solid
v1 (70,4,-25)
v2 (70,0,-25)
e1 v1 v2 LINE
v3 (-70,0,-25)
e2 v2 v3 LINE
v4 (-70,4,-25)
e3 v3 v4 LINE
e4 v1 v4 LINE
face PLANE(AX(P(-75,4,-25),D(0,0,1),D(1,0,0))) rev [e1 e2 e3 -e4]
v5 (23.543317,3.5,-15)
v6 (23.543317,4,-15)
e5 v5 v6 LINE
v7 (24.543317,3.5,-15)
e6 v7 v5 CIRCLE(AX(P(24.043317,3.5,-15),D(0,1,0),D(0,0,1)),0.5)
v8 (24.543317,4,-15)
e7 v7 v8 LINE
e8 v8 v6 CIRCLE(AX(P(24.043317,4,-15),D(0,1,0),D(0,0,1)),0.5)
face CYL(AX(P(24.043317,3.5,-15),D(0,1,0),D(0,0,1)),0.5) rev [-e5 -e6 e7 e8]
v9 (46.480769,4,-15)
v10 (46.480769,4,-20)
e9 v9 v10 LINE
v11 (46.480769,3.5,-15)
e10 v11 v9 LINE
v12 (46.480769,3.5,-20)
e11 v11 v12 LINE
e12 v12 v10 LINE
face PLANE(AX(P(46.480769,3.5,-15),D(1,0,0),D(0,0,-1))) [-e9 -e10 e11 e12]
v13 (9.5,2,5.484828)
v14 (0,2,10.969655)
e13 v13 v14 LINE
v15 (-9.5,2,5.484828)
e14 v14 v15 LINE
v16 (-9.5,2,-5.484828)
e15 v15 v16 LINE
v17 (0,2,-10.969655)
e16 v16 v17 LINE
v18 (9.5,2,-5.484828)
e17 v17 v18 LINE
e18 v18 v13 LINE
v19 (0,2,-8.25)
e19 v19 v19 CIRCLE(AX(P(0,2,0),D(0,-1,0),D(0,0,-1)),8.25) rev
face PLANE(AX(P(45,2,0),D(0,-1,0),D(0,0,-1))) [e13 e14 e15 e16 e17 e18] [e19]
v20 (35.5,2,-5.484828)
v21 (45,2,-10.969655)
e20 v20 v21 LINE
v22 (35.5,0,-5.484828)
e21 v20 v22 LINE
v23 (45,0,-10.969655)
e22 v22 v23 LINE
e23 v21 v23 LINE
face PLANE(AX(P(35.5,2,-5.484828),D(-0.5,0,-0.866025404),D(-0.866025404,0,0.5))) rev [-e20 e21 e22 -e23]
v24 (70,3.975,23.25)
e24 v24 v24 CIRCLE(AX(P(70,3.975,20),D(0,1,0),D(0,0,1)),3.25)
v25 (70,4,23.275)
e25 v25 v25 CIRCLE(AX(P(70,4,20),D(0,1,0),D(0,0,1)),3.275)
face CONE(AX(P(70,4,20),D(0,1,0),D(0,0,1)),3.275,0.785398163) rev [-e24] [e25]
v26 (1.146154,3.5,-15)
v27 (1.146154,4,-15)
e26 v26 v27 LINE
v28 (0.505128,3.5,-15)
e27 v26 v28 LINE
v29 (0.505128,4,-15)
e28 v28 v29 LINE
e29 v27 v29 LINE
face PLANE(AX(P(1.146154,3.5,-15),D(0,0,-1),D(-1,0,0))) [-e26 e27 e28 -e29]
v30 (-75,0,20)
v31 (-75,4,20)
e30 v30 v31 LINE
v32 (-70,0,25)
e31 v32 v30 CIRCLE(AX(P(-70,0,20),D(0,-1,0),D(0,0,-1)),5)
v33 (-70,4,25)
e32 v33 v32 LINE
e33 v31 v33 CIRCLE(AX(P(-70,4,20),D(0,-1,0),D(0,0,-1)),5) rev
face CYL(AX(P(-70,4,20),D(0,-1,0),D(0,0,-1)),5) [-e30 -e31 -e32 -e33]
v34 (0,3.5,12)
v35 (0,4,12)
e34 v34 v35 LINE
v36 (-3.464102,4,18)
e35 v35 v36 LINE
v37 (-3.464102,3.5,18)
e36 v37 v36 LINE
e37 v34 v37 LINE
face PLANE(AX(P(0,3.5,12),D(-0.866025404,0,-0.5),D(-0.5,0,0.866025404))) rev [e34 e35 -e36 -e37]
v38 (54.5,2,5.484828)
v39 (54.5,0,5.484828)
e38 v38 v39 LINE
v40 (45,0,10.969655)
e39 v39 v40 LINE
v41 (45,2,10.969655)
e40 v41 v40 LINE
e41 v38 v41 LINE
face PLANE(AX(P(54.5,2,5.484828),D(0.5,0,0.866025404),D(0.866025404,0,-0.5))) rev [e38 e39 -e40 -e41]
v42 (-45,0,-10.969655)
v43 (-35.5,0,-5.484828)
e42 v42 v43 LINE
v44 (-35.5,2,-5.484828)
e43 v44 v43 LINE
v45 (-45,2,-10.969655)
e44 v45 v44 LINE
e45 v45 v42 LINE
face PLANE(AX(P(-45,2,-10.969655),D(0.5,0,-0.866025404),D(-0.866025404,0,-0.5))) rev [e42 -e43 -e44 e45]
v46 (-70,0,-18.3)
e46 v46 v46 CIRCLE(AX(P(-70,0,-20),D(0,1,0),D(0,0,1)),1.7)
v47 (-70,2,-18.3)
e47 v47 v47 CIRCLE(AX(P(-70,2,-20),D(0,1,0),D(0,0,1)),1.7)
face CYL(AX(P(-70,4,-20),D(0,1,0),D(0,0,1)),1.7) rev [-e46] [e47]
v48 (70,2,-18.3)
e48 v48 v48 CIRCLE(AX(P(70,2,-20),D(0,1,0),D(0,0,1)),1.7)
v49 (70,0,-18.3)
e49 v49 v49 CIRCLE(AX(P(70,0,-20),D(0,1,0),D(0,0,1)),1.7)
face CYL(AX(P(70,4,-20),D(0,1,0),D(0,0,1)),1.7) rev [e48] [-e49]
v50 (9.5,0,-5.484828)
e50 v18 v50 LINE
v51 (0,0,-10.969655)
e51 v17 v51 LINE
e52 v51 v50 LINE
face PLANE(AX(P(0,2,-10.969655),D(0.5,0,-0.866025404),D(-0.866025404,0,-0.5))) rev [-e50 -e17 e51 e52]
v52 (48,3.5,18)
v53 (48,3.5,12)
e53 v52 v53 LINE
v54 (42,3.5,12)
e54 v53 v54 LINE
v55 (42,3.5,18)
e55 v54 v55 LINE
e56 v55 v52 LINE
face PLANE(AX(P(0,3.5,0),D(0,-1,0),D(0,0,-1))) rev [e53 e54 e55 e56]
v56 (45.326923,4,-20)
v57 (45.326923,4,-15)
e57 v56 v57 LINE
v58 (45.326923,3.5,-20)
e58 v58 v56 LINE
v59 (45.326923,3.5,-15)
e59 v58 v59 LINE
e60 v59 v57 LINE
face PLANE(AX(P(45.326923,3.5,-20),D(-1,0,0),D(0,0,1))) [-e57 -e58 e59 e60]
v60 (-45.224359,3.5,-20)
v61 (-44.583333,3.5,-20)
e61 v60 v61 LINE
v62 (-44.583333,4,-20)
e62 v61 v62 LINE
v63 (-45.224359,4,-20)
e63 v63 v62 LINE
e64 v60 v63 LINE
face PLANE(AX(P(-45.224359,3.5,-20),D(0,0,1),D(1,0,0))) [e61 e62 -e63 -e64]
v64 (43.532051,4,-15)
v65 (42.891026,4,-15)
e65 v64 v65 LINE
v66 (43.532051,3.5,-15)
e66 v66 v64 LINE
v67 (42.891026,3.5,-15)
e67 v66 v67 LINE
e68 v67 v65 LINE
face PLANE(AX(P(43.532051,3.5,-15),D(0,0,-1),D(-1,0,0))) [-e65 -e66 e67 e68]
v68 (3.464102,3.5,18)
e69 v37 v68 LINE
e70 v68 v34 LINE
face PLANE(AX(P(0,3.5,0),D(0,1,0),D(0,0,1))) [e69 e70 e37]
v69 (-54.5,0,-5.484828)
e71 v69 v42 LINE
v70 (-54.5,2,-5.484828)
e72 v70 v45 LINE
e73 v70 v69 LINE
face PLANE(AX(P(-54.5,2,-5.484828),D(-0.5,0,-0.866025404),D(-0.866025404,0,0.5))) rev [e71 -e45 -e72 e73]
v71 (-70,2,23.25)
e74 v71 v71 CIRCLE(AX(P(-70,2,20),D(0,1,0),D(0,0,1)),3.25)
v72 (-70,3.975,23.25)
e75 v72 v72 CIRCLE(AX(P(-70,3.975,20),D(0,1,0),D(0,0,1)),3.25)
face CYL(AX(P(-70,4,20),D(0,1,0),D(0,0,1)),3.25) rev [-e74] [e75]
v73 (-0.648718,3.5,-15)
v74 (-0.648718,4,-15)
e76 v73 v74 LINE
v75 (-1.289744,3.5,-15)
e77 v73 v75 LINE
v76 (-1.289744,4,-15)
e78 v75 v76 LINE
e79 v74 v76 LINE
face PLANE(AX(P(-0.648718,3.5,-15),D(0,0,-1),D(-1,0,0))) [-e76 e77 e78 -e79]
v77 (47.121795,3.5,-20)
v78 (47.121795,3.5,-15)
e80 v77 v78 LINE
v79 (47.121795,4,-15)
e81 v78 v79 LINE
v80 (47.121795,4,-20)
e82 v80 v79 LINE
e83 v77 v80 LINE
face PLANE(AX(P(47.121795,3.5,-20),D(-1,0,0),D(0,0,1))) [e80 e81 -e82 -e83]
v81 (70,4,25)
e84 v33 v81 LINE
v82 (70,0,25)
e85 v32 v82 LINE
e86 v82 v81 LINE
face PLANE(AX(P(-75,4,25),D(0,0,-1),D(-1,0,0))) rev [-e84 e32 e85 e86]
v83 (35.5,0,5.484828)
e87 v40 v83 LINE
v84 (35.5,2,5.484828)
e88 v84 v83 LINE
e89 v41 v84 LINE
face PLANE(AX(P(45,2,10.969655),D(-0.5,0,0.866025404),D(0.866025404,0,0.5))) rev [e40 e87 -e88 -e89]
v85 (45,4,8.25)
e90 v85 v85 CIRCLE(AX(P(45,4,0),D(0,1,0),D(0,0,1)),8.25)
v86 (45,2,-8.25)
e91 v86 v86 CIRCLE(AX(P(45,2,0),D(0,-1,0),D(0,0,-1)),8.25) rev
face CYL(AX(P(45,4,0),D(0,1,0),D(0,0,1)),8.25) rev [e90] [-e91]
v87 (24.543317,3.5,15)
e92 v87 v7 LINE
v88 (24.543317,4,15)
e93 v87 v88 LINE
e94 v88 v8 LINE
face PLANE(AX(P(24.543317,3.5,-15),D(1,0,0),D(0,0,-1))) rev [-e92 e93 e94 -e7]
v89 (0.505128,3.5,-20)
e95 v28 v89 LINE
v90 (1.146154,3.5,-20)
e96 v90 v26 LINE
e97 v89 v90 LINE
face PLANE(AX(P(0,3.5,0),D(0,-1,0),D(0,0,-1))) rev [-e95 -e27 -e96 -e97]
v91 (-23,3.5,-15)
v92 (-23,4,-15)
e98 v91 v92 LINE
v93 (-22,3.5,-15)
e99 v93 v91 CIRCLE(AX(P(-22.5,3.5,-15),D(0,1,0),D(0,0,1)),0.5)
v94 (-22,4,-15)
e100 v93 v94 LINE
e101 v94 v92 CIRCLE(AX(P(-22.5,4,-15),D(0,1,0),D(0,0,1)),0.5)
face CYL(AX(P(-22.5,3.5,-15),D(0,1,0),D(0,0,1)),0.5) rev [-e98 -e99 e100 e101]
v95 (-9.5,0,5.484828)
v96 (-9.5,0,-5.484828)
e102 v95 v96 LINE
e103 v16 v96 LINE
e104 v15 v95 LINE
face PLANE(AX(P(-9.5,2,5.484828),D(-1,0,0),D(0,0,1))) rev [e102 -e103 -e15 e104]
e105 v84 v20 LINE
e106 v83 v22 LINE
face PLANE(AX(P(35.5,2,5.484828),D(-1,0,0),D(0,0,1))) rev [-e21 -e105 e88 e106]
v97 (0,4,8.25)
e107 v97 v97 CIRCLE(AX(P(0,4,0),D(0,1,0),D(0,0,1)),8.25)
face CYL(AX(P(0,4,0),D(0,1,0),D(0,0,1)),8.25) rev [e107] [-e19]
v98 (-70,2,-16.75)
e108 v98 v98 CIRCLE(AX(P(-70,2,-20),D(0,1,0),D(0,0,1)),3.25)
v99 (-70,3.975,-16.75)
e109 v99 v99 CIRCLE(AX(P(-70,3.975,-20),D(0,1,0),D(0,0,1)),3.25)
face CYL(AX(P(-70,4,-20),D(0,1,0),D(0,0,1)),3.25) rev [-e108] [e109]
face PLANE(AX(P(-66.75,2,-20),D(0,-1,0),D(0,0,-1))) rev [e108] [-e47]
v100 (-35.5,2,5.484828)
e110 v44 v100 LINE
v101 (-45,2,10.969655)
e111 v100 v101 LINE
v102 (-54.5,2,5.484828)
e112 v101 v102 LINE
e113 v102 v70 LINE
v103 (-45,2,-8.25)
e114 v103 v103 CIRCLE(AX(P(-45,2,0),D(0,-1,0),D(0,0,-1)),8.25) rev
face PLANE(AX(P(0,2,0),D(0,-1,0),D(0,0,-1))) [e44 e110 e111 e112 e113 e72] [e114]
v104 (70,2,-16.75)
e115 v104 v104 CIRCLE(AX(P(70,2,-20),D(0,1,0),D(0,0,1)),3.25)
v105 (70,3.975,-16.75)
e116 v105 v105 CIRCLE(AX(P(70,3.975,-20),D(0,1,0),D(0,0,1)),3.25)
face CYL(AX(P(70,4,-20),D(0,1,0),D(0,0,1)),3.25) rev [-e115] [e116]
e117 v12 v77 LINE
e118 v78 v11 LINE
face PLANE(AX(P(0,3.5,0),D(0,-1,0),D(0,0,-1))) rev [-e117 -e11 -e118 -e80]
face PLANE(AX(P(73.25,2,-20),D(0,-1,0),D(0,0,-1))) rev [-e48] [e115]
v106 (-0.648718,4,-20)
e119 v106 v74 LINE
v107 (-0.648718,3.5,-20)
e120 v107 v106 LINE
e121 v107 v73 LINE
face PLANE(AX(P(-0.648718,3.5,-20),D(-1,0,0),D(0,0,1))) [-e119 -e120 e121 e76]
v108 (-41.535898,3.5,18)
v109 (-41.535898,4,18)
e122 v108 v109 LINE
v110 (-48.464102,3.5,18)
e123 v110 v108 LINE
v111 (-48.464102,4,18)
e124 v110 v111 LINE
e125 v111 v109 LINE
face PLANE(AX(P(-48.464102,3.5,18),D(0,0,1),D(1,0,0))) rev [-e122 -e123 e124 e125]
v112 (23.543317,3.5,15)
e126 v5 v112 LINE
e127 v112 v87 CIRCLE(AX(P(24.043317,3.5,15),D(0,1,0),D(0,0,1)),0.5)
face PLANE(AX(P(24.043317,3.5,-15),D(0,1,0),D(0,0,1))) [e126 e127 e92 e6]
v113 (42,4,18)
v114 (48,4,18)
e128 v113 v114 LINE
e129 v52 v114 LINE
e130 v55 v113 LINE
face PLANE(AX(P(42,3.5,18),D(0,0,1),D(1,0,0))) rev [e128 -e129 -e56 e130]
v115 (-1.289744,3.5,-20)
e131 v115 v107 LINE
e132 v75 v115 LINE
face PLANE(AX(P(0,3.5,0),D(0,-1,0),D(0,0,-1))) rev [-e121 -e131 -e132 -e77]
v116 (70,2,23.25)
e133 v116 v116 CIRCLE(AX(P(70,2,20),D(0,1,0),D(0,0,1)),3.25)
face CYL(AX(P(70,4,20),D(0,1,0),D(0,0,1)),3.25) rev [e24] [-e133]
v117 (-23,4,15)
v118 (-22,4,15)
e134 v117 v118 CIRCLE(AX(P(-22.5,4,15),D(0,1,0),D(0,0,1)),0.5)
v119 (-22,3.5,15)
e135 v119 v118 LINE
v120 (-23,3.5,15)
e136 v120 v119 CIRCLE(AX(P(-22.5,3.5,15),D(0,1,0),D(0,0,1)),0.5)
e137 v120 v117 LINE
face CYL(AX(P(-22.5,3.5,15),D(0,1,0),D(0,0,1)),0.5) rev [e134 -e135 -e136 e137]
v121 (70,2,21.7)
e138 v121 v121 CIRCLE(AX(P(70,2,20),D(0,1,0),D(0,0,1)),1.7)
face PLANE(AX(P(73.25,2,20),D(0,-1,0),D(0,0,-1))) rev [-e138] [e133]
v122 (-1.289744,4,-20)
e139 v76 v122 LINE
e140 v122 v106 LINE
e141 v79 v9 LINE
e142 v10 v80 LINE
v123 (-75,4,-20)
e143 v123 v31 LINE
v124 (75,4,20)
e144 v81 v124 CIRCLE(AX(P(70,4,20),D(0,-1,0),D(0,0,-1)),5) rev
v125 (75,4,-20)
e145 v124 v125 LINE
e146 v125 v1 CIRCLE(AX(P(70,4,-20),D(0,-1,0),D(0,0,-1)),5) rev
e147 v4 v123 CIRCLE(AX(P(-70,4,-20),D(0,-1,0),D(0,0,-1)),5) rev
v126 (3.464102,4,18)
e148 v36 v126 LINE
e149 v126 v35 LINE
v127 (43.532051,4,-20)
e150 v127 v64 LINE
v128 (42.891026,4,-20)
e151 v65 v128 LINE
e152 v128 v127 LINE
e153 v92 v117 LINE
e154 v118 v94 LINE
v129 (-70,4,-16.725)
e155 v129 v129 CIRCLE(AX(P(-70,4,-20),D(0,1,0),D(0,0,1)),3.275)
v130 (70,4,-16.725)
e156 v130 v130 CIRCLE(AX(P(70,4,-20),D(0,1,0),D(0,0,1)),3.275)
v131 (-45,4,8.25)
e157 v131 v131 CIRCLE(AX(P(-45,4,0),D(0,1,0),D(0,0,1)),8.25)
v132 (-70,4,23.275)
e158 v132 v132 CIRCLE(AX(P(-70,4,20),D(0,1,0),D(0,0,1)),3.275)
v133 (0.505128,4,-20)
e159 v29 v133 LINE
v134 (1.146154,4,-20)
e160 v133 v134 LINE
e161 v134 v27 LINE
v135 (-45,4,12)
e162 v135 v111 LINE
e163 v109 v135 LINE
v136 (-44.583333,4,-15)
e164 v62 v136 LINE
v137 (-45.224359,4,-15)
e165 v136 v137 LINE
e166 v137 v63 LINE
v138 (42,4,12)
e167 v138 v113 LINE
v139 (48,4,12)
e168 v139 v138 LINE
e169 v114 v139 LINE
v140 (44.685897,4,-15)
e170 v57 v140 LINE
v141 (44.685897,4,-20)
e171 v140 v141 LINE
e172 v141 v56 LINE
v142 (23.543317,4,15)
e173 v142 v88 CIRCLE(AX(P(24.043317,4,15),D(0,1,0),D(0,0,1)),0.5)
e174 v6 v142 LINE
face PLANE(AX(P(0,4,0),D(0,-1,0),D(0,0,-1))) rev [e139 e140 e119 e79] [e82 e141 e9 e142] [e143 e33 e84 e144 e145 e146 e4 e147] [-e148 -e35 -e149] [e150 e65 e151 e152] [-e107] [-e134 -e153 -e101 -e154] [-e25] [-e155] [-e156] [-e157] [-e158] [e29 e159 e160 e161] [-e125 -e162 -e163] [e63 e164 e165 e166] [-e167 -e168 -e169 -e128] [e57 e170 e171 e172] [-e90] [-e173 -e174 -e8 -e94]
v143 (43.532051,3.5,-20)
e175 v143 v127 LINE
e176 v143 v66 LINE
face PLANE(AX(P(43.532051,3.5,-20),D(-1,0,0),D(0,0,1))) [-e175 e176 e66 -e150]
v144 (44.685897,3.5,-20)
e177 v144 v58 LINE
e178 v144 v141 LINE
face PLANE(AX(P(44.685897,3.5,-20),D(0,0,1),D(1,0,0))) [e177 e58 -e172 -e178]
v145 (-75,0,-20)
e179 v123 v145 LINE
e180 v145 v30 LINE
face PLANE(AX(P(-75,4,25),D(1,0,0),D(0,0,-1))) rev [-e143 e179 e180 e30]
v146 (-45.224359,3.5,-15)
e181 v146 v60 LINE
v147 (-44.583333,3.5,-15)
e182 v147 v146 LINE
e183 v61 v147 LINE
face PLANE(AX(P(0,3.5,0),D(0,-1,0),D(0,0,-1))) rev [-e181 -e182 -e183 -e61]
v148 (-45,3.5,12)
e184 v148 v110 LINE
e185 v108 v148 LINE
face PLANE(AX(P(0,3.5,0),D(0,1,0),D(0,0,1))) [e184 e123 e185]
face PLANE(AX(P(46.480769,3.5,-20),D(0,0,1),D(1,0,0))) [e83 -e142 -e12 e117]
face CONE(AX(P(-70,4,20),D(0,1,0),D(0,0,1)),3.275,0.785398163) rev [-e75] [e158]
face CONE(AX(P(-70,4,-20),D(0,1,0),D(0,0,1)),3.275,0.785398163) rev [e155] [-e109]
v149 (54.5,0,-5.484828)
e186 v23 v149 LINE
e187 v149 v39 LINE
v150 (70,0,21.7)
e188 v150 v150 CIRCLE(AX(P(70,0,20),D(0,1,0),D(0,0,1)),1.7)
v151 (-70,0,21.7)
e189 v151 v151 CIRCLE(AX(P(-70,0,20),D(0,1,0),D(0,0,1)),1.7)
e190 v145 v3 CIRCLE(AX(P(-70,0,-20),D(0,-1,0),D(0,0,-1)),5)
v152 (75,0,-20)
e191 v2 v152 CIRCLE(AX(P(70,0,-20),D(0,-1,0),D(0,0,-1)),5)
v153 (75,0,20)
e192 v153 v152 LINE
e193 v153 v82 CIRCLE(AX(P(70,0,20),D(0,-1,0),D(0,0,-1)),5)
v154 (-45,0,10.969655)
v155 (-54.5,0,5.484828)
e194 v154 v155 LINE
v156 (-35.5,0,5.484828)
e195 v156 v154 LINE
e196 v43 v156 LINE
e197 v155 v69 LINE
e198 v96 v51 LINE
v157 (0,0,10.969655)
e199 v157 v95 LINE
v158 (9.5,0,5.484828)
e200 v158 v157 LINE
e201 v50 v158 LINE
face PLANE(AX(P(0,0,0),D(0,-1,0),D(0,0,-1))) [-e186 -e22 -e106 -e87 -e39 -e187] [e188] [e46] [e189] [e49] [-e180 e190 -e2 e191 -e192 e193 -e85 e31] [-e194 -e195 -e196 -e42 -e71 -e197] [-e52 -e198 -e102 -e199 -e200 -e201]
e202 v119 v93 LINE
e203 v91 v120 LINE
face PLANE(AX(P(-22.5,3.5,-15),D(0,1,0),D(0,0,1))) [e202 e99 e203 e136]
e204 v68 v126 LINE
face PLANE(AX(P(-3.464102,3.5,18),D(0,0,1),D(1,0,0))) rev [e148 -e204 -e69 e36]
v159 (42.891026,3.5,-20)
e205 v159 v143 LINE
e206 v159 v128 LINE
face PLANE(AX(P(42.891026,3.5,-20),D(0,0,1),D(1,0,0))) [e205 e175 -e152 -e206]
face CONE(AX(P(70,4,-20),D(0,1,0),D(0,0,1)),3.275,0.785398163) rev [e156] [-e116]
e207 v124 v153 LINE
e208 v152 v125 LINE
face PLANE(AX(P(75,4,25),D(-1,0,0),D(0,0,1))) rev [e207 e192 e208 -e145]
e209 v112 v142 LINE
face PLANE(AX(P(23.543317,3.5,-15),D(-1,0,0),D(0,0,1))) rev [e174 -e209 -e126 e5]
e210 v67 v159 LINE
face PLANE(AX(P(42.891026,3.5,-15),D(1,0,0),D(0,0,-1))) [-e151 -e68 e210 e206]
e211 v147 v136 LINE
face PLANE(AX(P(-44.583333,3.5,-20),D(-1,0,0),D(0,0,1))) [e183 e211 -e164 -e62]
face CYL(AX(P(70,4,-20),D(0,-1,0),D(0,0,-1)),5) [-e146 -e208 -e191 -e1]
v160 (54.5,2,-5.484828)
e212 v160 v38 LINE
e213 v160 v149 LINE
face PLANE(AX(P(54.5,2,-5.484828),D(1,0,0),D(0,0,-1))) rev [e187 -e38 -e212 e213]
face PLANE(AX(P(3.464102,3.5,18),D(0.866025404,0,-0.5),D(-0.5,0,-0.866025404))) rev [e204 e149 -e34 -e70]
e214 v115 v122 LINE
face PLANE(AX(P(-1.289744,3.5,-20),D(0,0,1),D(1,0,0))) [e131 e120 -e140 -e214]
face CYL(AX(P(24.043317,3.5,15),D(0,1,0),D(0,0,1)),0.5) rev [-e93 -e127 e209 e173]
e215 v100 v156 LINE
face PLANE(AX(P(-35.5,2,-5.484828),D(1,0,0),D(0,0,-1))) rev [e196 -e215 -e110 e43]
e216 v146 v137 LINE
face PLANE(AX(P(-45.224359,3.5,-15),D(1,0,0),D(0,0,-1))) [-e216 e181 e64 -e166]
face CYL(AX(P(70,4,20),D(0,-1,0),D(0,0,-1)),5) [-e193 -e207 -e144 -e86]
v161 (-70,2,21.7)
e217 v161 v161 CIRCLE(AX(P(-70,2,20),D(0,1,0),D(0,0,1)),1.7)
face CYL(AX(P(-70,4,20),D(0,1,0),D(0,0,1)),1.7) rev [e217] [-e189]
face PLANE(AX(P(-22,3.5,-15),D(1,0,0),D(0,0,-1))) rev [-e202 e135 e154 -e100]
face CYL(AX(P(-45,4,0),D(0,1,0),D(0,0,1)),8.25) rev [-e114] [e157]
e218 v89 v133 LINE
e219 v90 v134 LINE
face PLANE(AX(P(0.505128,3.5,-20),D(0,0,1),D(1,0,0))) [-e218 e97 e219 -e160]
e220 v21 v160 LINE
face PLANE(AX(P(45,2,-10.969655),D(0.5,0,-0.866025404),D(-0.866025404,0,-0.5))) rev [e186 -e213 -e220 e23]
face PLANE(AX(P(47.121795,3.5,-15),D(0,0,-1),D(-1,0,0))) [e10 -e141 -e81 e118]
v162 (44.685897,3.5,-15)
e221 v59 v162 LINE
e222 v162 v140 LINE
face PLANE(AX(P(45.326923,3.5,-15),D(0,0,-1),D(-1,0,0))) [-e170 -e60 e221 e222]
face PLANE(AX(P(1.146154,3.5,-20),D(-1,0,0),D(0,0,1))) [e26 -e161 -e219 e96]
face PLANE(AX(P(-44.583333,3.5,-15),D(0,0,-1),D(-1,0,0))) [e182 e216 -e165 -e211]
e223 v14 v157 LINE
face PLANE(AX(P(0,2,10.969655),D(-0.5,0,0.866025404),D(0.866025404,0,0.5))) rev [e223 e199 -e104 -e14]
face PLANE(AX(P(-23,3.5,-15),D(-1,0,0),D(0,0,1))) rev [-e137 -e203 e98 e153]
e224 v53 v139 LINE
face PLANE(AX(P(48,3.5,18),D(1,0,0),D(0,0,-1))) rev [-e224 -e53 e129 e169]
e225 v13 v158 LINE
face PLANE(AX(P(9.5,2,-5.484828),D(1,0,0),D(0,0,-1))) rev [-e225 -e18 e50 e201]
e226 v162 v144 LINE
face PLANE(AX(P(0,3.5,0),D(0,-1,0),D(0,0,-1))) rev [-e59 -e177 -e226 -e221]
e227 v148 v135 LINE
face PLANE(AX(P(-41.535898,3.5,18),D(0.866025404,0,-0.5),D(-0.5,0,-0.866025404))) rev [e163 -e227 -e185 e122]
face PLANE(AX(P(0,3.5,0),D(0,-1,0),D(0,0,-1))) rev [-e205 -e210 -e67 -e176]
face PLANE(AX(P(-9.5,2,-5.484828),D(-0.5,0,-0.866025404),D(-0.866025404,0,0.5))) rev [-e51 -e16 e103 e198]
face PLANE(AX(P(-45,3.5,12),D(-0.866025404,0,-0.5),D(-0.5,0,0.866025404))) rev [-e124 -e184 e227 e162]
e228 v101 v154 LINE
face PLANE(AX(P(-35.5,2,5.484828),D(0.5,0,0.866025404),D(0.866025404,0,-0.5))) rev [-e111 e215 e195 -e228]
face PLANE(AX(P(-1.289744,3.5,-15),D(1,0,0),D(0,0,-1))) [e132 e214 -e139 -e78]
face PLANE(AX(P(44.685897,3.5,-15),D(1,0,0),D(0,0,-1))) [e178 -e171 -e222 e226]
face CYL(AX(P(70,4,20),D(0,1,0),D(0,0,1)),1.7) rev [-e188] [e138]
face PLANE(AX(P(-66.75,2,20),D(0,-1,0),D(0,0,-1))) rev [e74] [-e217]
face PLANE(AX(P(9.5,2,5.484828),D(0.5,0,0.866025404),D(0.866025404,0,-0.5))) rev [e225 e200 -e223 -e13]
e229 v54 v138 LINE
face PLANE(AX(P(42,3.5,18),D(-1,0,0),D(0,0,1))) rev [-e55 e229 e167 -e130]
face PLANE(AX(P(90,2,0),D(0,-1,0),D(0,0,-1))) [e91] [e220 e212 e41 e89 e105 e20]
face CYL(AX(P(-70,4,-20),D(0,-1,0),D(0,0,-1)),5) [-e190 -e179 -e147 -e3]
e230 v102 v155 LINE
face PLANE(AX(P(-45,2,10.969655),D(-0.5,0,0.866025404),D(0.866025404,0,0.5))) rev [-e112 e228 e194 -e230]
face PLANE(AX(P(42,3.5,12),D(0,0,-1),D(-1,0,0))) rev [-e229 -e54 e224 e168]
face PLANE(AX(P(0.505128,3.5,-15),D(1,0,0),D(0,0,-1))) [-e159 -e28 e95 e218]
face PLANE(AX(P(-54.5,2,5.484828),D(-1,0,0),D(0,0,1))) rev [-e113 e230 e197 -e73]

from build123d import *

# Parameters (mm, degrees)
SKETCH1_W                = 150
SKETCH1_H                = 50
BODY_DEPTH               = 4
EDGE_FILLETS_R           = 5
GX16_HOLE_D              = 16.5
GX16_NUT_CUTOUT_DEPTH    = 2
GX16_PATTERN_COUNT       = 3
GX16_PATTERN_PITCH       = 45
DESIGN_CUTOUT_SKETCH_W   = 6
DESIGN_CUTOUT_SKETCH_H   = 6
DESIGN_CUTOUT_SKETCH_W_2 = 0.641025641
DESIGN_CUTOUT_SKETCH_H_2 = 5
DESIGN_CUTOUT_DEPTH      = 0.5


# Read off the part's stored shape, not the designer's step: mounting_holes
with BuildPart() as part:
    # Sketch1 → body (new body)
    with BuildSketch(Plane(origin=(0, 0, 0), x_dir=(1, 0, 0), z_dir=(0, 1, 0))):
        Rectangle(SKETCH1_W, SKETCH1_H)
    extrude(amount=BODY_DEPTH)

    # mounting_holes outline → mounting_holes (revolve, cut)
    with BuildSketch(Plane(origin=(70, 0, 20), x_dir=(1, 0, 0), z_dir=(0, 0, 1))):
        Polygon((0, 0), (1.7, 0), (1.7, 2), (3.25, 2), (3.25, 3.975), (3.275, 4), (0, 4), align=None)
    revolve(axis=Axis((70, 0, 20), (0, 1, 0)), mode=Mode.SUBTRACT)

    # mounting_holes 2 outline → mounting_holes 2 (revolve, cut)
    with BuildSketch(Plane(origin=(-70, 0, -20), x_dir=(1, 0, 0), z_dir=(0, 0, 1))):
        Polygon((0, 4), (0, 0), (1.7, 0), (1.7, 2), (3.25, 2), (3.25, 3.975), (3.275, 4), align=None)
    revolve(axis=Axis((-70, 0, -20), (0, 1, 0)), mode=Mode.SUBTRACT)

    # mounting_holes 3 outline → mounting_holes 3 (revolve, cut)
    with BuildSketch(Plane(origin=(70, 0, -20), x_dir=(1, 0, 0), z_dir=(0, 0, 1))):
        Polygon((0, 4), (0, 0), (1.7, 0), (1.7, 2), (3.25, 2), (3.25, 3.975), (3.275, 4), align=None)
    revolve(axis=Axis((70, 0, -20), (0, 1, 0)), mode=Mode.SUBTRACT)

    # mounting_holes 4 outline → mounting_holes 4 (revolve, cut)
    with BuildSketch(Plane(origin=(-70, 0, 20), x_dir=(1, 0, 0), z_dir=(0, 0, 1))):
        Polygon((0, 4), (0, 0), (1.7, 0), (1.7, 2), (3.25, 2), (3.25, 3.975), (3.275, 4), align=None)
    revolve(axis=Axis((-70, 0, 20), (0, 1, 0)), mode=Mode.SUBTRACT)

    # edge_fillets
    edge_fillets_edges = [part.edges().sort_by_distance(p)[0] for p in [
        (75, 2, 25),
        (-75, 2, 25),
        (-75, 2, -25),
        (75, 2, -25),
    ]]
    fillet(edge_fillets_edges, radius=EDGE_FILLETS_R)

    # gx16_hole (through all)
    with Locations(Plane(origin=(0, 4, 0), x_dir=(1, 0, 0), z_dir=(0, 1, 0))):
        with Locations((-45, 0)):
            gx16_hole = Hole(GX16_HOLE_D / 2)

    # Sketch6 → gx16_nut-cutout (cut)
    with BuildSketch(Plane.XZ):
        Polygon((-45, 10.969655115), (-54.5, 5.484827557), (-54.5, -5.484827557), (-45, -10.969655115), (-35.5, -5.484827557), (-35.5, 5.484827557), align=None)
    gx16_nut_cutout = extrude(amount=-GX16_NUT_CUTOUT_DEPTH, mode=Mode.SUBTRACT)

    # gx16_pattern: gx16_hole, gx16_nut-cutout ×3
    with Locations(*[(i * GX16_PATTERN_PITCH, 0, 0) for i in range(1, GX16_PATTERN_COUNT)]):
        add(gx16_hole, mode=Mode.SUBTRACT)
        add(gx16_nut_cutout, mode=Mode.SUBTRACT)

    # design_cutout_sketch → design_cutout (cut)
    with BuildSketch(Plane(origin=(0, 4, 0), x_dir=(1, 0, 0), z_dir=(0, 1, 0))):
        with BuildLine():
            Line((-22, 15), (-22, -15))
            ThreePointArc((-22, -15), (-22.5, -15.5), (-23, -15))
            Line((-23, -15), (-23, 15))
            ThreePointArc((-23, 15), (-22.5, 15.5), (-22, 15))
        make_face()
        with BuildLine():
            Line((24.543317326, 15), (24.543317326, -15))
            ThreePointArc((24.543317326, -15), (24.043317326, -15.5), (23.543317326, -15))
            Line((23.543317326, -15), (23.543317326, 15))
            ThreePointArc((23.543317326, 15), (24.043317326, 15.5), (24.543317326, 15))
        make_face()
        with Locations((45, -15)):
            Rectangle(DESIGN_CUTOUT_SKETCH_W, DESIGN_CUTOUT_SKETCH_H)
        Polygon((0, -12), (-3.464101615, -18), (3.464101615, -18), align=None)
        Polygon((-45, -12), (-48.464101615, -18), (-41.535898385, -18), align=None)
        with Locations((-44.903846154, 17.5)):
            Rectangle(DESIGN_CUTOUT_SKETCH_W_2, DESIGN_CUTOUT_SKETCH_H_2)
        with Locations((-0.969230769, 17.5)):
            Rectangle(DESIGN_CUTOUT_SKETCH_W_2, DESIGN_CUTOUT_SKETCH_H_2)
        with Locations((0.825641025, 17.5)):
            Rectangle(DESIGN_CUTOUT_SKETCH_W_2, DESIGN_CUTOUT_SKETCH_H_2)
        with Locations((43.211538462, 17.5)):
            Rectangle(DESIGN_CUTOUT_SKETCH_W_2, DESIGN_CUTOUT_SKETCH_H_2)
        with Locations((45.006410257, 17.5)):
            Rectangle(DESIGN_CUTOUT_SKETCH_W_2, DESIGN_CUTOUT_SKETCH_H_2)
        with Locations((46.801282052, 17.5)):
            Rectangle(DESIGN_CUTOUT_SKETCH_W_2, DESIGN_CUTOUT_SKETCH_H_2)
    extrude(amount=-DESIGN_CUTOUT_DEPTH, mode=Mode.SUBTRACT)


solid = part.part
